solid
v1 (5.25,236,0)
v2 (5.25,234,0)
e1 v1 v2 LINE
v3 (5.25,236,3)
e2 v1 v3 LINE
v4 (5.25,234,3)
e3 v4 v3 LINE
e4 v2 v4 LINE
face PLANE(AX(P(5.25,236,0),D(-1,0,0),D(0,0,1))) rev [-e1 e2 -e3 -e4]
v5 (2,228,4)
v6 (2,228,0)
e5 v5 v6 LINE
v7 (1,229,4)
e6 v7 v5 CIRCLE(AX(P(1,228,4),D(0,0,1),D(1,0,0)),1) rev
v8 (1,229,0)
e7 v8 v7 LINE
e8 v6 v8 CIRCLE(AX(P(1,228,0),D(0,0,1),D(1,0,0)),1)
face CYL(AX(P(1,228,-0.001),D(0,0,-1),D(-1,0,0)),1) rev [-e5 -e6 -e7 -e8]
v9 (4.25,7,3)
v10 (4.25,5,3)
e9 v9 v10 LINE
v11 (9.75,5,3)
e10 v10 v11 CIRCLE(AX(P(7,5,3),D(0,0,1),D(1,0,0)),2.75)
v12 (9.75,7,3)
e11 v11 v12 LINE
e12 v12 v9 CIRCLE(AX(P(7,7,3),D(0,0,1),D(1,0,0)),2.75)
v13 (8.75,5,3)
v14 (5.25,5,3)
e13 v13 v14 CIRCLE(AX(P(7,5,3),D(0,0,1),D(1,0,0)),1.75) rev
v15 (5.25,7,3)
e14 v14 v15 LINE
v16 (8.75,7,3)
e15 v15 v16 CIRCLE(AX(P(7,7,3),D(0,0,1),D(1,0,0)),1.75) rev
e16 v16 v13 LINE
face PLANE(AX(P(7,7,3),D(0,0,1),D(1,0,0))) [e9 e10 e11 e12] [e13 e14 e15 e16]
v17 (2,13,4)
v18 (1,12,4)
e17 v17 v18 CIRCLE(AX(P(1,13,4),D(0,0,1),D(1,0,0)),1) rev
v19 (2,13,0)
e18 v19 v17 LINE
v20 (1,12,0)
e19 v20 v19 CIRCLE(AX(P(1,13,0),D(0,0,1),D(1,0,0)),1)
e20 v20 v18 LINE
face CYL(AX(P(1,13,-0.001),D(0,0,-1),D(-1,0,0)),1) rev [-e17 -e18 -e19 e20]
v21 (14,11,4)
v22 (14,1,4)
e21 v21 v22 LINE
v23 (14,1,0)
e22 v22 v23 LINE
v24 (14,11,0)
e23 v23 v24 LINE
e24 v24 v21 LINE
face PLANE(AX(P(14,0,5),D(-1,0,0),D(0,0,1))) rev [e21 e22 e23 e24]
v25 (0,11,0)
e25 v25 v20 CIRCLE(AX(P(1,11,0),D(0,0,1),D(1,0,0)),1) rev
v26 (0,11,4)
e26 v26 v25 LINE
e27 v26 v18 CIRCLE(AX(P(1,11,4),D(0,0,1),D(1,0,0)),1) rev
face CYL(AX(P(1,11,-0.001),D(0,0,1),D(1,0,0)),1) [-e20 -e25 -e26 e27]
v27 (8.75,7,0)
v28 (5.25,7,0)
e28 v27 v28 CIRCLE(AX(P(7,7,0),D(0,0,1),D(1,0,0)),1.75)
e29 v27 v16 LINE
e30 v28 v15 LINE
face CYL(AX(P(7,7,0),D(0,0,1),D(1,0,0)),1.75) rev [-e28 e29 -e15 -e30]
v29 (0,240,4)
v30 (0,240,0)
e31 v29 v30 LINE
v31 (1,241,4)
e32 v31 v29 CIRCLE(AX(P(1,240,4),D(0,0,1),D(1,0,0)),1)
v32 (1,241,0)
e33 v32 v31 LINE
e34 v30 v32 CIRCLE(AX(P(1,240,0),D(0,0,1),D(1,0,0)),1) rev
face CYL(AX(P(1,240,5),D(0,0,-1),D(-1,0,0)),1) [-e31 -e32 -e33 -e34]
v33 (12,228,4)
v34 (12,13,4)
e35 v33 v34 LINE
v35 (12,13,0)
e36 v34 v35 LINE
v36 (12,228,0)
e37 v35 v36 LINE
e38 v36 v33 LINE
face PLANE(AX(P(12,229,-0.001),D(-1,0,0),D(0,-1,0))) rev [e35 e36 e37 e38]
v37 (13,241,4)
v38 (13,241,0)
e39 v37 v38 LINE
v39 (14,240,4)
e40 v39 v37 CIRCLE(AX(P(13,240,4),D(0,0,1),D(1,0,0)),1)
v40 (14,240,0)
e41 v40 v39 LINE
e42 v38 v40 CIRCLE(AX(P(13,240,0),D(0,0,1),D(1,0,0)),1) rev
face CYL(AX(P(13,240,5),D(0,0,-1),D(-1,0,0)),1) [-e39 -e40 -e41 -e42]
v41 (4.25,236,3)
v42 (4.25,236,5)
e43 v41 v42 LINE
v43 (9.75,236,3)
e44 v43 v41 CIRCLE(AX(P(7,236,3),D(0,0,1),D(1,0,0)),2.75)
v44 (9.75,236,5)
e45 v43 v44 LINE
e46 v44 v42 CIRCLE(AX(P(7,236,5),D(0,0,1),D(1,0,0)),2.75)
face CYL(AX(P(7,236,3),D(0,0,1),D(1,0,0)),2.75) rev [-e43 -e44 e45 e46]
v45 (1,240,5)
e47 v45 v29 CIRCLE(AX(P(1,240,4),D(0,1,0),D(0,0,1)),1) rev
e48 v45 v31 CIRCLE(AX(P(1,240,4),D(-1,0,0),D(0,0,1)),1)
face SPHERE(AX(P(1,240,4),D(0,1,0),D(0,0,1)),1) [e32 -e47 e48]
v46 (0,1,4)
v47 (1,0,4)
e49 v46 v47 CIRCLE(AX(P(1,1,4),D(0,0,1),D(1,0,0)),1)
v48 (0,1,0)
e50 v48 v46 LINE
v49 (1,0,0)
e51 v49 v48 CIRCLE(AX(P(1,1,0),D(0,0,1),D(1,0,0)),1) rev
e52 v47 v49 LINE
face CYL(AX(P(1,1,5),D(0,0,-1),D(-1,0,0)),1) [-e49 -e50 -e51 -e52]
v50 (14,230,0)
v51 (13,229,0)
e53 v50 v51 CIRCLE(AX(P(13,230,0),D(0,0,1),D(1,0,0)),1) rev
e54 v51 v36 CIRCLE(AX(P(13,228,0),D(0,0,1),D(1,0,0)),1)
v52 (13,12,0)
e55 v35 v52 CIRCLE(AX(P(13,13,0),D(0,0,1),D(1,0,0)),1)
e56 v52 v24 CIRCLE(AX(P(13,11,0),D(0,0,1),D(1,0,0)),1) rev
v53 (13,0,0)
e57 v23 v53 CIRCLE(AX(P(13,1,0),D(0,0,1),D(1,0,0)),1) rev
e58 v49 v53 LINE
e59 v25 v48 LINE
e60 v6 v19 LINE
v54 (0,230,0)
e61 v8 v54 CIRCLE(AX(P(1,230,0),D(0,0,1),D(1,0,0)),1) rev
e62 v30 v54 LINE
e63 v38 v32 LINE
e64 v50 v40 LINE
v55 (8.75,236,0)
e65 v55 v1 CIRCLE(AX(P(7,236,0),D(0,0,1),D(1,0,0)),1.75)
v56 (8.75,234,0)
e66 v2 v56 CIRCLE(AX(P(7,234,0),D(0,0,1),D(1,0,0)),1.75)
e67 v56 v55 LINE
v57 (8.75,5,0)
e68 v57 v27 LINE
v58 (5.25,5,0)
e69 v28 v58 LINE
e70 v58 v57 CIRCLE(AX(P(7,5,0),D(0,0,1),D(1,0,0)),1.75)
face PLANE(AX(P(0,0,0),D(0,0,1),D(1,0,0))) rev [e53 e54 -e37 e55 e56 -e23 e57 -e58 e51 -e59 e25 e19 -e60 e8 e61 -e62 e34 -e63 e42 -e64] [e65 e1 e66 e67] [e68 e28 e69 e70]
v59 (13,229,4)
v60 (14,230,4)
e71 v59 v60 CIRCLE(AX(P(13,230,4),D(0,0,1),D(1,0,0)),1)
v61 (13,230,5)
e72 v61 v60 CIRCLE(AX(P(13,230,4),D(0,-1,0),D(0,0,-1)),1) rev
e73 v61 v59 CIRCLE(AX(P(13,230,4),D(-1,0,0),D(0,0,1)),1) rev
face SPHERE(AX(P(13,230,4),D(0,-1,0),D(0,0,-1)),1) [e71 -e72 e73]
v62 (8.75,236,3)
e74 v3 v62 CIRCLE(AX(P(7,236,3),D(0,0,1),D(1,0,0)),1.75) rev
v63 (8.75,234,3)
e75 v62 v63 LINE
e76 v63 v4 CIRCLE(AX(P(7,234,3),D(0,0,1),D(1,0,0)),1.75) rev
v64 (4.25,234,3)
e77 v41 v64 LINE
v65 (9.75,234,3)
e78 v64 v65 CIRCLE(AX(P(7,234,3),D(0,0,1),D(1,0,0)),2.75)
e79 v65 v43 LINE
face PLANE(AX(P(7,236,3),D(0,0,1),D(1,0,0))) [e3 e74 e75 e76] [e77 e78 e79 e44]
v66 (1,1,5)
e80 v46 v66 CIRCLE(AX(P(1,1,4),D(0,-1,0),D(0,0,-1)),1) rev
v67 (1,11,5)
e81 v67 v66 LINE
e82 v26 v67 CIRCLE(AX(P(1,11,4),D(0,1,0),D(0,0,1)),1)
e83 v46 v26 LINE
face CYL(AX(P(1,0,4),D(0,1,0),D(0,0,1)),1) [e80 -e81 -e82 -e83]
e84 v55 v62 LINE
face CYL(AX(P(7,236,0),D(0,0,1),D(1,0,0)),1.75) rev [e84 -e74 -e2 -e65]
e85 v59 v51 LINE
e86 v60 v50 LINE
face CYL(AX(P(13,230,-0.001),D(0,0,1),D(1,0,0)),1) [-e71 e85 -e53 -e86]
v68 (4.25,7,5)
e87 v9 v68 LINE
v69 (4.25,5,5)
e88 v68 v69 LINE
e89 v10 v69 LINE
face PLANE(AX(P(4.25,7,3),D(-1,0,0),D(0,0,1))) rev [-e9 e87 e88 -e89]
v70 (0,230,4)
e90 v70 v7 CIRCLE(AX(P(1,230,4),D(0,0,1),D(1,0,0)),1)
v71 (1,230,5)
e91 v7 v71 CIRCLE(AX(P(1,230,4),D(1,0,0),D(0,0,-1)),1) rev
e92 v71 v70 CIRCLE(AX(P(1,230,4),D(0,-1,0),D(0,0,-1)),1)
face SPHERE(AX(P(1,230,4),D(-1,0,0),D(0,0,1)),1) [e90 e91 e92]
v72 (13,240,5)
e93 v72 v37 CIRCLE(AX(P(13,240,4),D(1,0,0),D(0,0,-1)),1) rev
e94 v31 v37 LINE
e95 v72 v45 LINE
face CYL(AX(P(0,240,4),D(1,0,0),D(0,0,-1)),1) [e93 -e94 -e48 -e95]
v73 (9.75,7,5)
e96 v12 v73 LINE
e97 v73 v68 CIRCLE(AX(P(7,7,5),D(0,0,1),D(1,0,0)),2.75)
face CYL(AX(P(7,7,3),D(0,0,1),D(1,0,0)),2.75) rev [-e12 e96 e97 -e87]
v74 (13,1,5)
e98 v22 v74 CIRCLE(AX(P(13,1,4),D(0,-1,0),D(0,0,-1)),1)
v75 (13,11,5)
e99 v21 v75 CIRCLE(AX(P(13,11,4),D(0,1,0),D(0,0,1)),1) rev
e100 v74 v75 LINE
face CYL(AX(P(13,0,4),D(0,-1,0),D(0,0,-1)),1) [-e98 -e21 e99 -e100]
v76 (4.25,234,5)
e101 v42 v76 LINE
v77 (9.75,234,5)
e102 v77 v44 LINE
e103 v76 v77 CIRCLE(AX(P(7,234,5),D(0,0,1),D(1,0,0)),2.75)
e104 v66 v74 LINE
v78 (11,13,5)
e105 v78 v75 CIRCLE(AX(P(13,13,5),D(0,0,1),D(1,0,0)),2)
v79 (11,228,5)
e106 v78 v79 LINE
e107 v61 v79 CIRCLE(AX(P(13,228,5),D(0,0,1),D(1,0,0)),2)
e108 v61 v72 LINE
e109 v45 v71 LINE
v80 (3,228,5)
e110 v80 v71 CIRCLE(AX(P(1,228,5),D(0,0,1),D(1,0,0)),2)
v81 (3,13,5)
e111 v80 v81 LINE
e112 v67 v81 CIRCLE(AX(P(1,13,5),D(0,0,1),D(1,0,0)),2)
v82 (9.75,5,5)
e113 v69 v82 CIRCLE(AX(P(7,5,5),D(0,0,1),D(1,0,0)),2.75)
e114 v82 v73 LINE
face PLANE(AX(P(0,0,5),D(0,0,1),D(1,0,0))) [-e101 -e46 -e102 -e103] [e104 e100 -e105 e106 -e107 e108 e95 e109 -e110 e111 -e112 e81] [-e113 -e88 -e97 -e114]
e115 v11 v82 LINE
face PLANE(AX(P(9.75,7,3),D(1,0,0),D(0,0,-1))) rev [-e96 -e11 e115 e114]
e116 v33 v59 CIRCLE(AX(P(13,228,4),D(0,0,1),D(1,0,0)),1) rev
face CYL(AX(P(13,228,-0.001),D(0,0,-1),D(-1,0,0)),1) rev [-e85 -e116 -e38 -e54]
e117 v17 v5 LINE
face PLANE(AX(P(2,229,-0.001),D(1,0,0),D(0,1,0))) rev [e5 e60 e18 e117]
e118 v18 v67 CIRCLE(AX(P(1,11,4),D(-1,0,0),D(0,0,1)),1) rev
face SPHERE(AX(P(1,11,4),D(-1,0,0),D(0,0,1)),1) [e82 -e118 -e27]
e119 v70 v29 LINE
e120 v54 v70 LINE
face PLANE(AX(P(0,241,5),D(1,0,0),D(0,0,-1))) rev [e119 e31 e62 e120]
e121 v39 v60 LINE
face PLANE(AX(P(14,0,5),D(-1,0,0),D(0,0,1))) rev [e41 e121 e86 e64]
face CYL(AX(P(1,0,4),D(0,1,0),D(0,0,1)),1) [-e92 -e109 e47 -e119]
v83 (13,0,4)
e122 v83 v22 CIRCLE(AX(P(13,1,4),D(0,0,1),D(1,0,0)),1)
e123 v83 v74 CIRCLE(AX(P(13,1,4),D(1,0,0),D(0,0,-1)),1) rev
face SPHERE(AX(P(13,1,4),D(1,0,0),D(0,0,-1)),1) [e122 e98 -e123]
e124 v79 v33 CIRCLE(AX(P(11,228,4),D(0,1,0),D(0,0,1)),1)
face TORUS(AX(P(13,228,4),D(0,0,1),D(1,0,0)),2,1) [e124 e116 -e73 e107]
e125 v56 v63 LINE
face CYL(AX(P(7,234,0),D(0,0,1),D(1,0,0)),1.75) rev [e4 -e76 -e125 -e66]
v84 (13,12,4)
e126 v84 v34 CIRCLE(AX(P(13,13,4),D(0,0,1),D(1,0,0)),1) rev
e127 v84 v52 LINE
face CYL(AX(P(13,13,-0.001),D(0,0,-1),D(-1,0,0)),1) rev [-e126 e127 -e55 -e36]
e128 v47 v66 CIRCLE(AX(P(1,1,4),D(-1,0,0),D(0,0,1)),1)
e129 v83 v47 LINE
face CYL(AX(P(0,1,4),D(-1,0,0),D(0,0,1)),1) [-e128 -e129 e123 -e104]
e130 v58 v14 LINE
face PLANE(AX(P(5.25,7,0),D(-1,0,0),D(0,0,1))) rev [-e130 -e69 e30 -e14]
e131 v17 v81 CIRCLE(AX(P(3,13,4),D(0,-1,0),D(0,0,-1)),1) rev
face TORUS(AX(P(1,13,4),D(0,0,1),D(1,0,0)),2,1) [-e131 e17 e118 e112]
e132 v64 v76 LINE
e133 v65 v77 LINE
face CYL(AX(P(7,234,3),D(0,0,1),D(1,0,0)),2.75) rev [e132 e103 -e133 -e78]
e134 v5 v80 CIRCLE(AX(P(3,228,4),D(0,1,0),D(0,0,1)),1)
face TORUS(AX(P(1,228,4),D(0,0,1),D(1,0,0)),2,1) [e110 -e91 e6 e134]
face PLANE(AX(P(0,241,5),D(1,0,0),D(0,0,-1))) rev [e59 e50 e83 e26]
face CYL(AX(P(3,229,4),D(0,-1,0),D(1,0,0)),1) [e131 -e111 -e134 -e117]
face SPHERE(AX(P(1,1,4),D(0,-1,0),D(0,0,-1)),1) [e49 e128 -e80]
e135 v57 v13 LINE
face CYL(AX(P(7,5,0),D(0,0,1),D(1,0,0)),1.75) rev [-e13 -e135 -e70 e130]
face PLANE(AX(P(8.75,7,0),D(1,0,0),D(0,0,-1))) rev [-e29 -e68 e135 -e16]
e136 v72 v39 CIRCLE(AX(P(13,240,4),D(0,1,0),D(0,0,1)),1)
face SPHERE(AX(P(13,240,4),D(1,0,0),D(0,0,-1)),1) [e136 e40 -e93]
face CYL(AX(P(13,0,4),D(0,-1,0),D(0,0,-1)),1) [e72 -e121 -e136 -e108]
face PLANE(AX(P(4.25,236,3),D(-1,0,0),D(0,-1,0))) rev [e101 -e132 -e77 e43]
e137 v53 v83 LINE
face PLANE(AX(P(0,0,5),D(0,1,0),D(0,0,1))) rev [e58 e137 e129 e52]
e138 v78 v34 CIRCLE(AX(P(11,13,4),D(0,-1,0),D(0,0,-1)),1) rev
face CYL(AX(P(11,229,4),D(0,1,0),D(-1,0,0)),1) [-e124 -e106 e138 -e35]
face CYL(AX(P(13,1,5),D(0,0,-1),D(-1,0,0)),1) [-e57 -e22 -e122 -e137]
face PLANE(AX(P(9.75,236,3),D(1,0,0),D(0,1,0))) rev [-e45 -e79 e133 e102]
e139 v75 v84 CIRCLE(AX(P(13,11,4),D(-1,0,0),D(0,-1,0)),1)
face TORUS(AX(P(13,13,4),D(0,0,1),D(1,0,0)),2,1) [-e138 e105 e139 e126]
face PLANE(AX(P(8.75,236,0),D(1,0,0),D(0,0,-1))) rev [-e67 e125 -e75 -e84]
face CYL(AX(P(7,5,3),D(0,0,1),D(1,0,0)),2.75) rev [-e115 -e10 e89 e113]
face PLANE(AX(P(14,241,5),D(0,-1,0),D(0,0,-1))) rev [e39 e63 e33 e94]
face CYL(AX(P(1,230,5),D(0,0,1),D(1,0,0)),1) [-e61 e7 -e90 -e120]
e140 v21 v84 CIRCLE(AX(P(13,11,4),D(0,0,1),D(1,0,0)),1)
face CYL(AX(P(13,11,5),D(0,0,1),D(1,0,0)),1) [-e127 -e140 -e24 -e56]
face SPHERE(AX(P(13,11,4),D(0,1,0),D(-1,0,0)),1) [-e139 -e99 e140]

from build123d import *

# Parameters (mm, degrees)
SKETCH1_W           = 14
SKETCH1_H           = 241
BOSS_EXTRUDE1_DEPTH = 5
CUT_EXTRUDE3_REACH  = 243.458
SKETCH4_W           = 2
SKETCH4_H           = 217
CUT_EXTRUDE1_DEPTH  = 242.458070894
CUT_EXTRUDE2_DEPTH  = 2
FILLET1_R           = 1


with BuildPart() as part:
    # Sketch1 → Boss-Extrude1 (new body)
    with BuildSketch(Plane.XY):
        with Locations((7, 120.5)):
            Rectangle(SKETCH1_W, SKETCH1_H)
    extrude(amount=BOSS_EXTRUDE1_DEPTH)

    # Sketch4 → Cut-Extrude3 (cut, up to next)
    with BuildSketch(Plane.XY.offset(5), mode=Mode.PRIVATE) as cut_extrude3_sk1:
        with Locations((1, 120.5)):
            Rectangle(SKETCH4_W, SKETCH4_H)
    cut_extrude3_tool1 = extrude(cut_extrude3_sk1.sketch, amount=-CUT_EXTRUDE3_REACH, mode=Mode.PRIVATE) & part.part
    # Sketch4 → Cut-Extrude3 (cut, up to next)
    with BuildSketch(Plane.XY.offset(5), mode=Mode.PRIVATE) as cut_extrude3_sk2:
        with Locations((13, 120.5)):
            Rectangle(SKETCH4_W, SKETCH4_H)
    cut_extrude3_tool2 = extrude(cut_extrude3_sk2.sketch, amount=-CUT_EXTRUDE3_REACH, mode=Mode.PRIVATE) & part.part
    add(cut_extrude3_tool1.solids().sort_by_distance((1, 120.5, 5))[0], mode=Mode.SUBTRACT)
    add(cut_extrude3_tool2.solids().sort_by_distance((13, 120.5, 5))[0], mode=Mode.SUBTRACT)

    # Sketch2 → Cut-Extrude1 (cut, through all)
    with BuildSketch(Plane.XY.offset(5)):
        with BuildLine():
            Line((8.75, 7), (8.75, 5))
            ThreePointArc((8.75, 5), (7, 3.25), (5.25, 5))
            Line((5.25, 5), (5.25, 7))
            ThreePointArc((5.25, 7), (7, 8.75), (8.75, 7))
        make_face()
        with BuildLine():
            Line((8.75, 236), (8.75, 234))
            ThreePointArc((8.75, 234), (7, 232.25), (5.25, 234))
            Line((5.25, 234), (5.25, 236))
            ThreePointArc((5.25, 236), (7, 237.75), (8.75, 236))
        make_face()
    extrude(amount=-CUT_EXTRUDE1_DEPTH, mode=Mode.SUBTRACT)

    # Sketch3 → Cut-Extrude2 (cut)
    with BuildSketch(Plane.XY.offset(5)):
        with BuildLine():
            Line((9.75, 7), (9.75, 5))
            ThreePointArc((9.75, 5), (7, 2.25), (4.25, 5))
            Line((4.25, 5), (4.25, 7))
            ThreePointArc((4.25, 7), (7, 9.75), (9.75, 7))
        make_face()
        with BuildLine():
            Line((9.75, 236), (9.75, 234))
            ThreePointArc((9.75, 234), (7, 231.25), (4.25, 234))
            Line((4.25, 234), (4.25, 236))
            ThreePointArc((4.25, 236), (7, 238.75), (9.75, 236))
        make_face()
    extrude(amount=-CUT_EXTRUDE2_DEPTH, mode=Mode.SUBTRACT)

    # Fillet1
    fillet1_edges = [part.edges().sort_by_distance(p)[0] for p in [
        (2, 229, 2.5),
        (12, 229, 2.5),
        (12, 12, 2.5),
        (2, 12, 2.5),
    ]]
    fillet(fillet1_edges, radius=FILLET1_R)
    fillet1_2_edges = [part.edges().sort_by_distance(p)[0] for p in [
        (0, 241, 2.5),
        (14, 241, 2.5),
        (7, 241, 5),
        (14, 6, 5),
        (14, 235, 5),
        (0, 6, 5),
        (0, 235, 5),
        (7, 0, 5),
        (0, 0, 2.5),
        (14, 0, 2.5),
        (0, 229, 2.5),
        (14, 229, 2.5),
        (12, 120.5, 5),
        (14, 12, 2.5),
        (2, 120.5, 5),
        (0, 12, 2.5),
        (1.707106781, 228.707106781, 5),
        (1.707106781, 12.292893219, 5),
        (12.292893219, 228.707106781, 5),
        (12.292893219, 12.292893219, 5),
    ]]
    fillet(fillet1_2_edges, radius=FILLET1_R - 0.0001)  # a hair under: the kernel refuses the full size


solid = part.part
